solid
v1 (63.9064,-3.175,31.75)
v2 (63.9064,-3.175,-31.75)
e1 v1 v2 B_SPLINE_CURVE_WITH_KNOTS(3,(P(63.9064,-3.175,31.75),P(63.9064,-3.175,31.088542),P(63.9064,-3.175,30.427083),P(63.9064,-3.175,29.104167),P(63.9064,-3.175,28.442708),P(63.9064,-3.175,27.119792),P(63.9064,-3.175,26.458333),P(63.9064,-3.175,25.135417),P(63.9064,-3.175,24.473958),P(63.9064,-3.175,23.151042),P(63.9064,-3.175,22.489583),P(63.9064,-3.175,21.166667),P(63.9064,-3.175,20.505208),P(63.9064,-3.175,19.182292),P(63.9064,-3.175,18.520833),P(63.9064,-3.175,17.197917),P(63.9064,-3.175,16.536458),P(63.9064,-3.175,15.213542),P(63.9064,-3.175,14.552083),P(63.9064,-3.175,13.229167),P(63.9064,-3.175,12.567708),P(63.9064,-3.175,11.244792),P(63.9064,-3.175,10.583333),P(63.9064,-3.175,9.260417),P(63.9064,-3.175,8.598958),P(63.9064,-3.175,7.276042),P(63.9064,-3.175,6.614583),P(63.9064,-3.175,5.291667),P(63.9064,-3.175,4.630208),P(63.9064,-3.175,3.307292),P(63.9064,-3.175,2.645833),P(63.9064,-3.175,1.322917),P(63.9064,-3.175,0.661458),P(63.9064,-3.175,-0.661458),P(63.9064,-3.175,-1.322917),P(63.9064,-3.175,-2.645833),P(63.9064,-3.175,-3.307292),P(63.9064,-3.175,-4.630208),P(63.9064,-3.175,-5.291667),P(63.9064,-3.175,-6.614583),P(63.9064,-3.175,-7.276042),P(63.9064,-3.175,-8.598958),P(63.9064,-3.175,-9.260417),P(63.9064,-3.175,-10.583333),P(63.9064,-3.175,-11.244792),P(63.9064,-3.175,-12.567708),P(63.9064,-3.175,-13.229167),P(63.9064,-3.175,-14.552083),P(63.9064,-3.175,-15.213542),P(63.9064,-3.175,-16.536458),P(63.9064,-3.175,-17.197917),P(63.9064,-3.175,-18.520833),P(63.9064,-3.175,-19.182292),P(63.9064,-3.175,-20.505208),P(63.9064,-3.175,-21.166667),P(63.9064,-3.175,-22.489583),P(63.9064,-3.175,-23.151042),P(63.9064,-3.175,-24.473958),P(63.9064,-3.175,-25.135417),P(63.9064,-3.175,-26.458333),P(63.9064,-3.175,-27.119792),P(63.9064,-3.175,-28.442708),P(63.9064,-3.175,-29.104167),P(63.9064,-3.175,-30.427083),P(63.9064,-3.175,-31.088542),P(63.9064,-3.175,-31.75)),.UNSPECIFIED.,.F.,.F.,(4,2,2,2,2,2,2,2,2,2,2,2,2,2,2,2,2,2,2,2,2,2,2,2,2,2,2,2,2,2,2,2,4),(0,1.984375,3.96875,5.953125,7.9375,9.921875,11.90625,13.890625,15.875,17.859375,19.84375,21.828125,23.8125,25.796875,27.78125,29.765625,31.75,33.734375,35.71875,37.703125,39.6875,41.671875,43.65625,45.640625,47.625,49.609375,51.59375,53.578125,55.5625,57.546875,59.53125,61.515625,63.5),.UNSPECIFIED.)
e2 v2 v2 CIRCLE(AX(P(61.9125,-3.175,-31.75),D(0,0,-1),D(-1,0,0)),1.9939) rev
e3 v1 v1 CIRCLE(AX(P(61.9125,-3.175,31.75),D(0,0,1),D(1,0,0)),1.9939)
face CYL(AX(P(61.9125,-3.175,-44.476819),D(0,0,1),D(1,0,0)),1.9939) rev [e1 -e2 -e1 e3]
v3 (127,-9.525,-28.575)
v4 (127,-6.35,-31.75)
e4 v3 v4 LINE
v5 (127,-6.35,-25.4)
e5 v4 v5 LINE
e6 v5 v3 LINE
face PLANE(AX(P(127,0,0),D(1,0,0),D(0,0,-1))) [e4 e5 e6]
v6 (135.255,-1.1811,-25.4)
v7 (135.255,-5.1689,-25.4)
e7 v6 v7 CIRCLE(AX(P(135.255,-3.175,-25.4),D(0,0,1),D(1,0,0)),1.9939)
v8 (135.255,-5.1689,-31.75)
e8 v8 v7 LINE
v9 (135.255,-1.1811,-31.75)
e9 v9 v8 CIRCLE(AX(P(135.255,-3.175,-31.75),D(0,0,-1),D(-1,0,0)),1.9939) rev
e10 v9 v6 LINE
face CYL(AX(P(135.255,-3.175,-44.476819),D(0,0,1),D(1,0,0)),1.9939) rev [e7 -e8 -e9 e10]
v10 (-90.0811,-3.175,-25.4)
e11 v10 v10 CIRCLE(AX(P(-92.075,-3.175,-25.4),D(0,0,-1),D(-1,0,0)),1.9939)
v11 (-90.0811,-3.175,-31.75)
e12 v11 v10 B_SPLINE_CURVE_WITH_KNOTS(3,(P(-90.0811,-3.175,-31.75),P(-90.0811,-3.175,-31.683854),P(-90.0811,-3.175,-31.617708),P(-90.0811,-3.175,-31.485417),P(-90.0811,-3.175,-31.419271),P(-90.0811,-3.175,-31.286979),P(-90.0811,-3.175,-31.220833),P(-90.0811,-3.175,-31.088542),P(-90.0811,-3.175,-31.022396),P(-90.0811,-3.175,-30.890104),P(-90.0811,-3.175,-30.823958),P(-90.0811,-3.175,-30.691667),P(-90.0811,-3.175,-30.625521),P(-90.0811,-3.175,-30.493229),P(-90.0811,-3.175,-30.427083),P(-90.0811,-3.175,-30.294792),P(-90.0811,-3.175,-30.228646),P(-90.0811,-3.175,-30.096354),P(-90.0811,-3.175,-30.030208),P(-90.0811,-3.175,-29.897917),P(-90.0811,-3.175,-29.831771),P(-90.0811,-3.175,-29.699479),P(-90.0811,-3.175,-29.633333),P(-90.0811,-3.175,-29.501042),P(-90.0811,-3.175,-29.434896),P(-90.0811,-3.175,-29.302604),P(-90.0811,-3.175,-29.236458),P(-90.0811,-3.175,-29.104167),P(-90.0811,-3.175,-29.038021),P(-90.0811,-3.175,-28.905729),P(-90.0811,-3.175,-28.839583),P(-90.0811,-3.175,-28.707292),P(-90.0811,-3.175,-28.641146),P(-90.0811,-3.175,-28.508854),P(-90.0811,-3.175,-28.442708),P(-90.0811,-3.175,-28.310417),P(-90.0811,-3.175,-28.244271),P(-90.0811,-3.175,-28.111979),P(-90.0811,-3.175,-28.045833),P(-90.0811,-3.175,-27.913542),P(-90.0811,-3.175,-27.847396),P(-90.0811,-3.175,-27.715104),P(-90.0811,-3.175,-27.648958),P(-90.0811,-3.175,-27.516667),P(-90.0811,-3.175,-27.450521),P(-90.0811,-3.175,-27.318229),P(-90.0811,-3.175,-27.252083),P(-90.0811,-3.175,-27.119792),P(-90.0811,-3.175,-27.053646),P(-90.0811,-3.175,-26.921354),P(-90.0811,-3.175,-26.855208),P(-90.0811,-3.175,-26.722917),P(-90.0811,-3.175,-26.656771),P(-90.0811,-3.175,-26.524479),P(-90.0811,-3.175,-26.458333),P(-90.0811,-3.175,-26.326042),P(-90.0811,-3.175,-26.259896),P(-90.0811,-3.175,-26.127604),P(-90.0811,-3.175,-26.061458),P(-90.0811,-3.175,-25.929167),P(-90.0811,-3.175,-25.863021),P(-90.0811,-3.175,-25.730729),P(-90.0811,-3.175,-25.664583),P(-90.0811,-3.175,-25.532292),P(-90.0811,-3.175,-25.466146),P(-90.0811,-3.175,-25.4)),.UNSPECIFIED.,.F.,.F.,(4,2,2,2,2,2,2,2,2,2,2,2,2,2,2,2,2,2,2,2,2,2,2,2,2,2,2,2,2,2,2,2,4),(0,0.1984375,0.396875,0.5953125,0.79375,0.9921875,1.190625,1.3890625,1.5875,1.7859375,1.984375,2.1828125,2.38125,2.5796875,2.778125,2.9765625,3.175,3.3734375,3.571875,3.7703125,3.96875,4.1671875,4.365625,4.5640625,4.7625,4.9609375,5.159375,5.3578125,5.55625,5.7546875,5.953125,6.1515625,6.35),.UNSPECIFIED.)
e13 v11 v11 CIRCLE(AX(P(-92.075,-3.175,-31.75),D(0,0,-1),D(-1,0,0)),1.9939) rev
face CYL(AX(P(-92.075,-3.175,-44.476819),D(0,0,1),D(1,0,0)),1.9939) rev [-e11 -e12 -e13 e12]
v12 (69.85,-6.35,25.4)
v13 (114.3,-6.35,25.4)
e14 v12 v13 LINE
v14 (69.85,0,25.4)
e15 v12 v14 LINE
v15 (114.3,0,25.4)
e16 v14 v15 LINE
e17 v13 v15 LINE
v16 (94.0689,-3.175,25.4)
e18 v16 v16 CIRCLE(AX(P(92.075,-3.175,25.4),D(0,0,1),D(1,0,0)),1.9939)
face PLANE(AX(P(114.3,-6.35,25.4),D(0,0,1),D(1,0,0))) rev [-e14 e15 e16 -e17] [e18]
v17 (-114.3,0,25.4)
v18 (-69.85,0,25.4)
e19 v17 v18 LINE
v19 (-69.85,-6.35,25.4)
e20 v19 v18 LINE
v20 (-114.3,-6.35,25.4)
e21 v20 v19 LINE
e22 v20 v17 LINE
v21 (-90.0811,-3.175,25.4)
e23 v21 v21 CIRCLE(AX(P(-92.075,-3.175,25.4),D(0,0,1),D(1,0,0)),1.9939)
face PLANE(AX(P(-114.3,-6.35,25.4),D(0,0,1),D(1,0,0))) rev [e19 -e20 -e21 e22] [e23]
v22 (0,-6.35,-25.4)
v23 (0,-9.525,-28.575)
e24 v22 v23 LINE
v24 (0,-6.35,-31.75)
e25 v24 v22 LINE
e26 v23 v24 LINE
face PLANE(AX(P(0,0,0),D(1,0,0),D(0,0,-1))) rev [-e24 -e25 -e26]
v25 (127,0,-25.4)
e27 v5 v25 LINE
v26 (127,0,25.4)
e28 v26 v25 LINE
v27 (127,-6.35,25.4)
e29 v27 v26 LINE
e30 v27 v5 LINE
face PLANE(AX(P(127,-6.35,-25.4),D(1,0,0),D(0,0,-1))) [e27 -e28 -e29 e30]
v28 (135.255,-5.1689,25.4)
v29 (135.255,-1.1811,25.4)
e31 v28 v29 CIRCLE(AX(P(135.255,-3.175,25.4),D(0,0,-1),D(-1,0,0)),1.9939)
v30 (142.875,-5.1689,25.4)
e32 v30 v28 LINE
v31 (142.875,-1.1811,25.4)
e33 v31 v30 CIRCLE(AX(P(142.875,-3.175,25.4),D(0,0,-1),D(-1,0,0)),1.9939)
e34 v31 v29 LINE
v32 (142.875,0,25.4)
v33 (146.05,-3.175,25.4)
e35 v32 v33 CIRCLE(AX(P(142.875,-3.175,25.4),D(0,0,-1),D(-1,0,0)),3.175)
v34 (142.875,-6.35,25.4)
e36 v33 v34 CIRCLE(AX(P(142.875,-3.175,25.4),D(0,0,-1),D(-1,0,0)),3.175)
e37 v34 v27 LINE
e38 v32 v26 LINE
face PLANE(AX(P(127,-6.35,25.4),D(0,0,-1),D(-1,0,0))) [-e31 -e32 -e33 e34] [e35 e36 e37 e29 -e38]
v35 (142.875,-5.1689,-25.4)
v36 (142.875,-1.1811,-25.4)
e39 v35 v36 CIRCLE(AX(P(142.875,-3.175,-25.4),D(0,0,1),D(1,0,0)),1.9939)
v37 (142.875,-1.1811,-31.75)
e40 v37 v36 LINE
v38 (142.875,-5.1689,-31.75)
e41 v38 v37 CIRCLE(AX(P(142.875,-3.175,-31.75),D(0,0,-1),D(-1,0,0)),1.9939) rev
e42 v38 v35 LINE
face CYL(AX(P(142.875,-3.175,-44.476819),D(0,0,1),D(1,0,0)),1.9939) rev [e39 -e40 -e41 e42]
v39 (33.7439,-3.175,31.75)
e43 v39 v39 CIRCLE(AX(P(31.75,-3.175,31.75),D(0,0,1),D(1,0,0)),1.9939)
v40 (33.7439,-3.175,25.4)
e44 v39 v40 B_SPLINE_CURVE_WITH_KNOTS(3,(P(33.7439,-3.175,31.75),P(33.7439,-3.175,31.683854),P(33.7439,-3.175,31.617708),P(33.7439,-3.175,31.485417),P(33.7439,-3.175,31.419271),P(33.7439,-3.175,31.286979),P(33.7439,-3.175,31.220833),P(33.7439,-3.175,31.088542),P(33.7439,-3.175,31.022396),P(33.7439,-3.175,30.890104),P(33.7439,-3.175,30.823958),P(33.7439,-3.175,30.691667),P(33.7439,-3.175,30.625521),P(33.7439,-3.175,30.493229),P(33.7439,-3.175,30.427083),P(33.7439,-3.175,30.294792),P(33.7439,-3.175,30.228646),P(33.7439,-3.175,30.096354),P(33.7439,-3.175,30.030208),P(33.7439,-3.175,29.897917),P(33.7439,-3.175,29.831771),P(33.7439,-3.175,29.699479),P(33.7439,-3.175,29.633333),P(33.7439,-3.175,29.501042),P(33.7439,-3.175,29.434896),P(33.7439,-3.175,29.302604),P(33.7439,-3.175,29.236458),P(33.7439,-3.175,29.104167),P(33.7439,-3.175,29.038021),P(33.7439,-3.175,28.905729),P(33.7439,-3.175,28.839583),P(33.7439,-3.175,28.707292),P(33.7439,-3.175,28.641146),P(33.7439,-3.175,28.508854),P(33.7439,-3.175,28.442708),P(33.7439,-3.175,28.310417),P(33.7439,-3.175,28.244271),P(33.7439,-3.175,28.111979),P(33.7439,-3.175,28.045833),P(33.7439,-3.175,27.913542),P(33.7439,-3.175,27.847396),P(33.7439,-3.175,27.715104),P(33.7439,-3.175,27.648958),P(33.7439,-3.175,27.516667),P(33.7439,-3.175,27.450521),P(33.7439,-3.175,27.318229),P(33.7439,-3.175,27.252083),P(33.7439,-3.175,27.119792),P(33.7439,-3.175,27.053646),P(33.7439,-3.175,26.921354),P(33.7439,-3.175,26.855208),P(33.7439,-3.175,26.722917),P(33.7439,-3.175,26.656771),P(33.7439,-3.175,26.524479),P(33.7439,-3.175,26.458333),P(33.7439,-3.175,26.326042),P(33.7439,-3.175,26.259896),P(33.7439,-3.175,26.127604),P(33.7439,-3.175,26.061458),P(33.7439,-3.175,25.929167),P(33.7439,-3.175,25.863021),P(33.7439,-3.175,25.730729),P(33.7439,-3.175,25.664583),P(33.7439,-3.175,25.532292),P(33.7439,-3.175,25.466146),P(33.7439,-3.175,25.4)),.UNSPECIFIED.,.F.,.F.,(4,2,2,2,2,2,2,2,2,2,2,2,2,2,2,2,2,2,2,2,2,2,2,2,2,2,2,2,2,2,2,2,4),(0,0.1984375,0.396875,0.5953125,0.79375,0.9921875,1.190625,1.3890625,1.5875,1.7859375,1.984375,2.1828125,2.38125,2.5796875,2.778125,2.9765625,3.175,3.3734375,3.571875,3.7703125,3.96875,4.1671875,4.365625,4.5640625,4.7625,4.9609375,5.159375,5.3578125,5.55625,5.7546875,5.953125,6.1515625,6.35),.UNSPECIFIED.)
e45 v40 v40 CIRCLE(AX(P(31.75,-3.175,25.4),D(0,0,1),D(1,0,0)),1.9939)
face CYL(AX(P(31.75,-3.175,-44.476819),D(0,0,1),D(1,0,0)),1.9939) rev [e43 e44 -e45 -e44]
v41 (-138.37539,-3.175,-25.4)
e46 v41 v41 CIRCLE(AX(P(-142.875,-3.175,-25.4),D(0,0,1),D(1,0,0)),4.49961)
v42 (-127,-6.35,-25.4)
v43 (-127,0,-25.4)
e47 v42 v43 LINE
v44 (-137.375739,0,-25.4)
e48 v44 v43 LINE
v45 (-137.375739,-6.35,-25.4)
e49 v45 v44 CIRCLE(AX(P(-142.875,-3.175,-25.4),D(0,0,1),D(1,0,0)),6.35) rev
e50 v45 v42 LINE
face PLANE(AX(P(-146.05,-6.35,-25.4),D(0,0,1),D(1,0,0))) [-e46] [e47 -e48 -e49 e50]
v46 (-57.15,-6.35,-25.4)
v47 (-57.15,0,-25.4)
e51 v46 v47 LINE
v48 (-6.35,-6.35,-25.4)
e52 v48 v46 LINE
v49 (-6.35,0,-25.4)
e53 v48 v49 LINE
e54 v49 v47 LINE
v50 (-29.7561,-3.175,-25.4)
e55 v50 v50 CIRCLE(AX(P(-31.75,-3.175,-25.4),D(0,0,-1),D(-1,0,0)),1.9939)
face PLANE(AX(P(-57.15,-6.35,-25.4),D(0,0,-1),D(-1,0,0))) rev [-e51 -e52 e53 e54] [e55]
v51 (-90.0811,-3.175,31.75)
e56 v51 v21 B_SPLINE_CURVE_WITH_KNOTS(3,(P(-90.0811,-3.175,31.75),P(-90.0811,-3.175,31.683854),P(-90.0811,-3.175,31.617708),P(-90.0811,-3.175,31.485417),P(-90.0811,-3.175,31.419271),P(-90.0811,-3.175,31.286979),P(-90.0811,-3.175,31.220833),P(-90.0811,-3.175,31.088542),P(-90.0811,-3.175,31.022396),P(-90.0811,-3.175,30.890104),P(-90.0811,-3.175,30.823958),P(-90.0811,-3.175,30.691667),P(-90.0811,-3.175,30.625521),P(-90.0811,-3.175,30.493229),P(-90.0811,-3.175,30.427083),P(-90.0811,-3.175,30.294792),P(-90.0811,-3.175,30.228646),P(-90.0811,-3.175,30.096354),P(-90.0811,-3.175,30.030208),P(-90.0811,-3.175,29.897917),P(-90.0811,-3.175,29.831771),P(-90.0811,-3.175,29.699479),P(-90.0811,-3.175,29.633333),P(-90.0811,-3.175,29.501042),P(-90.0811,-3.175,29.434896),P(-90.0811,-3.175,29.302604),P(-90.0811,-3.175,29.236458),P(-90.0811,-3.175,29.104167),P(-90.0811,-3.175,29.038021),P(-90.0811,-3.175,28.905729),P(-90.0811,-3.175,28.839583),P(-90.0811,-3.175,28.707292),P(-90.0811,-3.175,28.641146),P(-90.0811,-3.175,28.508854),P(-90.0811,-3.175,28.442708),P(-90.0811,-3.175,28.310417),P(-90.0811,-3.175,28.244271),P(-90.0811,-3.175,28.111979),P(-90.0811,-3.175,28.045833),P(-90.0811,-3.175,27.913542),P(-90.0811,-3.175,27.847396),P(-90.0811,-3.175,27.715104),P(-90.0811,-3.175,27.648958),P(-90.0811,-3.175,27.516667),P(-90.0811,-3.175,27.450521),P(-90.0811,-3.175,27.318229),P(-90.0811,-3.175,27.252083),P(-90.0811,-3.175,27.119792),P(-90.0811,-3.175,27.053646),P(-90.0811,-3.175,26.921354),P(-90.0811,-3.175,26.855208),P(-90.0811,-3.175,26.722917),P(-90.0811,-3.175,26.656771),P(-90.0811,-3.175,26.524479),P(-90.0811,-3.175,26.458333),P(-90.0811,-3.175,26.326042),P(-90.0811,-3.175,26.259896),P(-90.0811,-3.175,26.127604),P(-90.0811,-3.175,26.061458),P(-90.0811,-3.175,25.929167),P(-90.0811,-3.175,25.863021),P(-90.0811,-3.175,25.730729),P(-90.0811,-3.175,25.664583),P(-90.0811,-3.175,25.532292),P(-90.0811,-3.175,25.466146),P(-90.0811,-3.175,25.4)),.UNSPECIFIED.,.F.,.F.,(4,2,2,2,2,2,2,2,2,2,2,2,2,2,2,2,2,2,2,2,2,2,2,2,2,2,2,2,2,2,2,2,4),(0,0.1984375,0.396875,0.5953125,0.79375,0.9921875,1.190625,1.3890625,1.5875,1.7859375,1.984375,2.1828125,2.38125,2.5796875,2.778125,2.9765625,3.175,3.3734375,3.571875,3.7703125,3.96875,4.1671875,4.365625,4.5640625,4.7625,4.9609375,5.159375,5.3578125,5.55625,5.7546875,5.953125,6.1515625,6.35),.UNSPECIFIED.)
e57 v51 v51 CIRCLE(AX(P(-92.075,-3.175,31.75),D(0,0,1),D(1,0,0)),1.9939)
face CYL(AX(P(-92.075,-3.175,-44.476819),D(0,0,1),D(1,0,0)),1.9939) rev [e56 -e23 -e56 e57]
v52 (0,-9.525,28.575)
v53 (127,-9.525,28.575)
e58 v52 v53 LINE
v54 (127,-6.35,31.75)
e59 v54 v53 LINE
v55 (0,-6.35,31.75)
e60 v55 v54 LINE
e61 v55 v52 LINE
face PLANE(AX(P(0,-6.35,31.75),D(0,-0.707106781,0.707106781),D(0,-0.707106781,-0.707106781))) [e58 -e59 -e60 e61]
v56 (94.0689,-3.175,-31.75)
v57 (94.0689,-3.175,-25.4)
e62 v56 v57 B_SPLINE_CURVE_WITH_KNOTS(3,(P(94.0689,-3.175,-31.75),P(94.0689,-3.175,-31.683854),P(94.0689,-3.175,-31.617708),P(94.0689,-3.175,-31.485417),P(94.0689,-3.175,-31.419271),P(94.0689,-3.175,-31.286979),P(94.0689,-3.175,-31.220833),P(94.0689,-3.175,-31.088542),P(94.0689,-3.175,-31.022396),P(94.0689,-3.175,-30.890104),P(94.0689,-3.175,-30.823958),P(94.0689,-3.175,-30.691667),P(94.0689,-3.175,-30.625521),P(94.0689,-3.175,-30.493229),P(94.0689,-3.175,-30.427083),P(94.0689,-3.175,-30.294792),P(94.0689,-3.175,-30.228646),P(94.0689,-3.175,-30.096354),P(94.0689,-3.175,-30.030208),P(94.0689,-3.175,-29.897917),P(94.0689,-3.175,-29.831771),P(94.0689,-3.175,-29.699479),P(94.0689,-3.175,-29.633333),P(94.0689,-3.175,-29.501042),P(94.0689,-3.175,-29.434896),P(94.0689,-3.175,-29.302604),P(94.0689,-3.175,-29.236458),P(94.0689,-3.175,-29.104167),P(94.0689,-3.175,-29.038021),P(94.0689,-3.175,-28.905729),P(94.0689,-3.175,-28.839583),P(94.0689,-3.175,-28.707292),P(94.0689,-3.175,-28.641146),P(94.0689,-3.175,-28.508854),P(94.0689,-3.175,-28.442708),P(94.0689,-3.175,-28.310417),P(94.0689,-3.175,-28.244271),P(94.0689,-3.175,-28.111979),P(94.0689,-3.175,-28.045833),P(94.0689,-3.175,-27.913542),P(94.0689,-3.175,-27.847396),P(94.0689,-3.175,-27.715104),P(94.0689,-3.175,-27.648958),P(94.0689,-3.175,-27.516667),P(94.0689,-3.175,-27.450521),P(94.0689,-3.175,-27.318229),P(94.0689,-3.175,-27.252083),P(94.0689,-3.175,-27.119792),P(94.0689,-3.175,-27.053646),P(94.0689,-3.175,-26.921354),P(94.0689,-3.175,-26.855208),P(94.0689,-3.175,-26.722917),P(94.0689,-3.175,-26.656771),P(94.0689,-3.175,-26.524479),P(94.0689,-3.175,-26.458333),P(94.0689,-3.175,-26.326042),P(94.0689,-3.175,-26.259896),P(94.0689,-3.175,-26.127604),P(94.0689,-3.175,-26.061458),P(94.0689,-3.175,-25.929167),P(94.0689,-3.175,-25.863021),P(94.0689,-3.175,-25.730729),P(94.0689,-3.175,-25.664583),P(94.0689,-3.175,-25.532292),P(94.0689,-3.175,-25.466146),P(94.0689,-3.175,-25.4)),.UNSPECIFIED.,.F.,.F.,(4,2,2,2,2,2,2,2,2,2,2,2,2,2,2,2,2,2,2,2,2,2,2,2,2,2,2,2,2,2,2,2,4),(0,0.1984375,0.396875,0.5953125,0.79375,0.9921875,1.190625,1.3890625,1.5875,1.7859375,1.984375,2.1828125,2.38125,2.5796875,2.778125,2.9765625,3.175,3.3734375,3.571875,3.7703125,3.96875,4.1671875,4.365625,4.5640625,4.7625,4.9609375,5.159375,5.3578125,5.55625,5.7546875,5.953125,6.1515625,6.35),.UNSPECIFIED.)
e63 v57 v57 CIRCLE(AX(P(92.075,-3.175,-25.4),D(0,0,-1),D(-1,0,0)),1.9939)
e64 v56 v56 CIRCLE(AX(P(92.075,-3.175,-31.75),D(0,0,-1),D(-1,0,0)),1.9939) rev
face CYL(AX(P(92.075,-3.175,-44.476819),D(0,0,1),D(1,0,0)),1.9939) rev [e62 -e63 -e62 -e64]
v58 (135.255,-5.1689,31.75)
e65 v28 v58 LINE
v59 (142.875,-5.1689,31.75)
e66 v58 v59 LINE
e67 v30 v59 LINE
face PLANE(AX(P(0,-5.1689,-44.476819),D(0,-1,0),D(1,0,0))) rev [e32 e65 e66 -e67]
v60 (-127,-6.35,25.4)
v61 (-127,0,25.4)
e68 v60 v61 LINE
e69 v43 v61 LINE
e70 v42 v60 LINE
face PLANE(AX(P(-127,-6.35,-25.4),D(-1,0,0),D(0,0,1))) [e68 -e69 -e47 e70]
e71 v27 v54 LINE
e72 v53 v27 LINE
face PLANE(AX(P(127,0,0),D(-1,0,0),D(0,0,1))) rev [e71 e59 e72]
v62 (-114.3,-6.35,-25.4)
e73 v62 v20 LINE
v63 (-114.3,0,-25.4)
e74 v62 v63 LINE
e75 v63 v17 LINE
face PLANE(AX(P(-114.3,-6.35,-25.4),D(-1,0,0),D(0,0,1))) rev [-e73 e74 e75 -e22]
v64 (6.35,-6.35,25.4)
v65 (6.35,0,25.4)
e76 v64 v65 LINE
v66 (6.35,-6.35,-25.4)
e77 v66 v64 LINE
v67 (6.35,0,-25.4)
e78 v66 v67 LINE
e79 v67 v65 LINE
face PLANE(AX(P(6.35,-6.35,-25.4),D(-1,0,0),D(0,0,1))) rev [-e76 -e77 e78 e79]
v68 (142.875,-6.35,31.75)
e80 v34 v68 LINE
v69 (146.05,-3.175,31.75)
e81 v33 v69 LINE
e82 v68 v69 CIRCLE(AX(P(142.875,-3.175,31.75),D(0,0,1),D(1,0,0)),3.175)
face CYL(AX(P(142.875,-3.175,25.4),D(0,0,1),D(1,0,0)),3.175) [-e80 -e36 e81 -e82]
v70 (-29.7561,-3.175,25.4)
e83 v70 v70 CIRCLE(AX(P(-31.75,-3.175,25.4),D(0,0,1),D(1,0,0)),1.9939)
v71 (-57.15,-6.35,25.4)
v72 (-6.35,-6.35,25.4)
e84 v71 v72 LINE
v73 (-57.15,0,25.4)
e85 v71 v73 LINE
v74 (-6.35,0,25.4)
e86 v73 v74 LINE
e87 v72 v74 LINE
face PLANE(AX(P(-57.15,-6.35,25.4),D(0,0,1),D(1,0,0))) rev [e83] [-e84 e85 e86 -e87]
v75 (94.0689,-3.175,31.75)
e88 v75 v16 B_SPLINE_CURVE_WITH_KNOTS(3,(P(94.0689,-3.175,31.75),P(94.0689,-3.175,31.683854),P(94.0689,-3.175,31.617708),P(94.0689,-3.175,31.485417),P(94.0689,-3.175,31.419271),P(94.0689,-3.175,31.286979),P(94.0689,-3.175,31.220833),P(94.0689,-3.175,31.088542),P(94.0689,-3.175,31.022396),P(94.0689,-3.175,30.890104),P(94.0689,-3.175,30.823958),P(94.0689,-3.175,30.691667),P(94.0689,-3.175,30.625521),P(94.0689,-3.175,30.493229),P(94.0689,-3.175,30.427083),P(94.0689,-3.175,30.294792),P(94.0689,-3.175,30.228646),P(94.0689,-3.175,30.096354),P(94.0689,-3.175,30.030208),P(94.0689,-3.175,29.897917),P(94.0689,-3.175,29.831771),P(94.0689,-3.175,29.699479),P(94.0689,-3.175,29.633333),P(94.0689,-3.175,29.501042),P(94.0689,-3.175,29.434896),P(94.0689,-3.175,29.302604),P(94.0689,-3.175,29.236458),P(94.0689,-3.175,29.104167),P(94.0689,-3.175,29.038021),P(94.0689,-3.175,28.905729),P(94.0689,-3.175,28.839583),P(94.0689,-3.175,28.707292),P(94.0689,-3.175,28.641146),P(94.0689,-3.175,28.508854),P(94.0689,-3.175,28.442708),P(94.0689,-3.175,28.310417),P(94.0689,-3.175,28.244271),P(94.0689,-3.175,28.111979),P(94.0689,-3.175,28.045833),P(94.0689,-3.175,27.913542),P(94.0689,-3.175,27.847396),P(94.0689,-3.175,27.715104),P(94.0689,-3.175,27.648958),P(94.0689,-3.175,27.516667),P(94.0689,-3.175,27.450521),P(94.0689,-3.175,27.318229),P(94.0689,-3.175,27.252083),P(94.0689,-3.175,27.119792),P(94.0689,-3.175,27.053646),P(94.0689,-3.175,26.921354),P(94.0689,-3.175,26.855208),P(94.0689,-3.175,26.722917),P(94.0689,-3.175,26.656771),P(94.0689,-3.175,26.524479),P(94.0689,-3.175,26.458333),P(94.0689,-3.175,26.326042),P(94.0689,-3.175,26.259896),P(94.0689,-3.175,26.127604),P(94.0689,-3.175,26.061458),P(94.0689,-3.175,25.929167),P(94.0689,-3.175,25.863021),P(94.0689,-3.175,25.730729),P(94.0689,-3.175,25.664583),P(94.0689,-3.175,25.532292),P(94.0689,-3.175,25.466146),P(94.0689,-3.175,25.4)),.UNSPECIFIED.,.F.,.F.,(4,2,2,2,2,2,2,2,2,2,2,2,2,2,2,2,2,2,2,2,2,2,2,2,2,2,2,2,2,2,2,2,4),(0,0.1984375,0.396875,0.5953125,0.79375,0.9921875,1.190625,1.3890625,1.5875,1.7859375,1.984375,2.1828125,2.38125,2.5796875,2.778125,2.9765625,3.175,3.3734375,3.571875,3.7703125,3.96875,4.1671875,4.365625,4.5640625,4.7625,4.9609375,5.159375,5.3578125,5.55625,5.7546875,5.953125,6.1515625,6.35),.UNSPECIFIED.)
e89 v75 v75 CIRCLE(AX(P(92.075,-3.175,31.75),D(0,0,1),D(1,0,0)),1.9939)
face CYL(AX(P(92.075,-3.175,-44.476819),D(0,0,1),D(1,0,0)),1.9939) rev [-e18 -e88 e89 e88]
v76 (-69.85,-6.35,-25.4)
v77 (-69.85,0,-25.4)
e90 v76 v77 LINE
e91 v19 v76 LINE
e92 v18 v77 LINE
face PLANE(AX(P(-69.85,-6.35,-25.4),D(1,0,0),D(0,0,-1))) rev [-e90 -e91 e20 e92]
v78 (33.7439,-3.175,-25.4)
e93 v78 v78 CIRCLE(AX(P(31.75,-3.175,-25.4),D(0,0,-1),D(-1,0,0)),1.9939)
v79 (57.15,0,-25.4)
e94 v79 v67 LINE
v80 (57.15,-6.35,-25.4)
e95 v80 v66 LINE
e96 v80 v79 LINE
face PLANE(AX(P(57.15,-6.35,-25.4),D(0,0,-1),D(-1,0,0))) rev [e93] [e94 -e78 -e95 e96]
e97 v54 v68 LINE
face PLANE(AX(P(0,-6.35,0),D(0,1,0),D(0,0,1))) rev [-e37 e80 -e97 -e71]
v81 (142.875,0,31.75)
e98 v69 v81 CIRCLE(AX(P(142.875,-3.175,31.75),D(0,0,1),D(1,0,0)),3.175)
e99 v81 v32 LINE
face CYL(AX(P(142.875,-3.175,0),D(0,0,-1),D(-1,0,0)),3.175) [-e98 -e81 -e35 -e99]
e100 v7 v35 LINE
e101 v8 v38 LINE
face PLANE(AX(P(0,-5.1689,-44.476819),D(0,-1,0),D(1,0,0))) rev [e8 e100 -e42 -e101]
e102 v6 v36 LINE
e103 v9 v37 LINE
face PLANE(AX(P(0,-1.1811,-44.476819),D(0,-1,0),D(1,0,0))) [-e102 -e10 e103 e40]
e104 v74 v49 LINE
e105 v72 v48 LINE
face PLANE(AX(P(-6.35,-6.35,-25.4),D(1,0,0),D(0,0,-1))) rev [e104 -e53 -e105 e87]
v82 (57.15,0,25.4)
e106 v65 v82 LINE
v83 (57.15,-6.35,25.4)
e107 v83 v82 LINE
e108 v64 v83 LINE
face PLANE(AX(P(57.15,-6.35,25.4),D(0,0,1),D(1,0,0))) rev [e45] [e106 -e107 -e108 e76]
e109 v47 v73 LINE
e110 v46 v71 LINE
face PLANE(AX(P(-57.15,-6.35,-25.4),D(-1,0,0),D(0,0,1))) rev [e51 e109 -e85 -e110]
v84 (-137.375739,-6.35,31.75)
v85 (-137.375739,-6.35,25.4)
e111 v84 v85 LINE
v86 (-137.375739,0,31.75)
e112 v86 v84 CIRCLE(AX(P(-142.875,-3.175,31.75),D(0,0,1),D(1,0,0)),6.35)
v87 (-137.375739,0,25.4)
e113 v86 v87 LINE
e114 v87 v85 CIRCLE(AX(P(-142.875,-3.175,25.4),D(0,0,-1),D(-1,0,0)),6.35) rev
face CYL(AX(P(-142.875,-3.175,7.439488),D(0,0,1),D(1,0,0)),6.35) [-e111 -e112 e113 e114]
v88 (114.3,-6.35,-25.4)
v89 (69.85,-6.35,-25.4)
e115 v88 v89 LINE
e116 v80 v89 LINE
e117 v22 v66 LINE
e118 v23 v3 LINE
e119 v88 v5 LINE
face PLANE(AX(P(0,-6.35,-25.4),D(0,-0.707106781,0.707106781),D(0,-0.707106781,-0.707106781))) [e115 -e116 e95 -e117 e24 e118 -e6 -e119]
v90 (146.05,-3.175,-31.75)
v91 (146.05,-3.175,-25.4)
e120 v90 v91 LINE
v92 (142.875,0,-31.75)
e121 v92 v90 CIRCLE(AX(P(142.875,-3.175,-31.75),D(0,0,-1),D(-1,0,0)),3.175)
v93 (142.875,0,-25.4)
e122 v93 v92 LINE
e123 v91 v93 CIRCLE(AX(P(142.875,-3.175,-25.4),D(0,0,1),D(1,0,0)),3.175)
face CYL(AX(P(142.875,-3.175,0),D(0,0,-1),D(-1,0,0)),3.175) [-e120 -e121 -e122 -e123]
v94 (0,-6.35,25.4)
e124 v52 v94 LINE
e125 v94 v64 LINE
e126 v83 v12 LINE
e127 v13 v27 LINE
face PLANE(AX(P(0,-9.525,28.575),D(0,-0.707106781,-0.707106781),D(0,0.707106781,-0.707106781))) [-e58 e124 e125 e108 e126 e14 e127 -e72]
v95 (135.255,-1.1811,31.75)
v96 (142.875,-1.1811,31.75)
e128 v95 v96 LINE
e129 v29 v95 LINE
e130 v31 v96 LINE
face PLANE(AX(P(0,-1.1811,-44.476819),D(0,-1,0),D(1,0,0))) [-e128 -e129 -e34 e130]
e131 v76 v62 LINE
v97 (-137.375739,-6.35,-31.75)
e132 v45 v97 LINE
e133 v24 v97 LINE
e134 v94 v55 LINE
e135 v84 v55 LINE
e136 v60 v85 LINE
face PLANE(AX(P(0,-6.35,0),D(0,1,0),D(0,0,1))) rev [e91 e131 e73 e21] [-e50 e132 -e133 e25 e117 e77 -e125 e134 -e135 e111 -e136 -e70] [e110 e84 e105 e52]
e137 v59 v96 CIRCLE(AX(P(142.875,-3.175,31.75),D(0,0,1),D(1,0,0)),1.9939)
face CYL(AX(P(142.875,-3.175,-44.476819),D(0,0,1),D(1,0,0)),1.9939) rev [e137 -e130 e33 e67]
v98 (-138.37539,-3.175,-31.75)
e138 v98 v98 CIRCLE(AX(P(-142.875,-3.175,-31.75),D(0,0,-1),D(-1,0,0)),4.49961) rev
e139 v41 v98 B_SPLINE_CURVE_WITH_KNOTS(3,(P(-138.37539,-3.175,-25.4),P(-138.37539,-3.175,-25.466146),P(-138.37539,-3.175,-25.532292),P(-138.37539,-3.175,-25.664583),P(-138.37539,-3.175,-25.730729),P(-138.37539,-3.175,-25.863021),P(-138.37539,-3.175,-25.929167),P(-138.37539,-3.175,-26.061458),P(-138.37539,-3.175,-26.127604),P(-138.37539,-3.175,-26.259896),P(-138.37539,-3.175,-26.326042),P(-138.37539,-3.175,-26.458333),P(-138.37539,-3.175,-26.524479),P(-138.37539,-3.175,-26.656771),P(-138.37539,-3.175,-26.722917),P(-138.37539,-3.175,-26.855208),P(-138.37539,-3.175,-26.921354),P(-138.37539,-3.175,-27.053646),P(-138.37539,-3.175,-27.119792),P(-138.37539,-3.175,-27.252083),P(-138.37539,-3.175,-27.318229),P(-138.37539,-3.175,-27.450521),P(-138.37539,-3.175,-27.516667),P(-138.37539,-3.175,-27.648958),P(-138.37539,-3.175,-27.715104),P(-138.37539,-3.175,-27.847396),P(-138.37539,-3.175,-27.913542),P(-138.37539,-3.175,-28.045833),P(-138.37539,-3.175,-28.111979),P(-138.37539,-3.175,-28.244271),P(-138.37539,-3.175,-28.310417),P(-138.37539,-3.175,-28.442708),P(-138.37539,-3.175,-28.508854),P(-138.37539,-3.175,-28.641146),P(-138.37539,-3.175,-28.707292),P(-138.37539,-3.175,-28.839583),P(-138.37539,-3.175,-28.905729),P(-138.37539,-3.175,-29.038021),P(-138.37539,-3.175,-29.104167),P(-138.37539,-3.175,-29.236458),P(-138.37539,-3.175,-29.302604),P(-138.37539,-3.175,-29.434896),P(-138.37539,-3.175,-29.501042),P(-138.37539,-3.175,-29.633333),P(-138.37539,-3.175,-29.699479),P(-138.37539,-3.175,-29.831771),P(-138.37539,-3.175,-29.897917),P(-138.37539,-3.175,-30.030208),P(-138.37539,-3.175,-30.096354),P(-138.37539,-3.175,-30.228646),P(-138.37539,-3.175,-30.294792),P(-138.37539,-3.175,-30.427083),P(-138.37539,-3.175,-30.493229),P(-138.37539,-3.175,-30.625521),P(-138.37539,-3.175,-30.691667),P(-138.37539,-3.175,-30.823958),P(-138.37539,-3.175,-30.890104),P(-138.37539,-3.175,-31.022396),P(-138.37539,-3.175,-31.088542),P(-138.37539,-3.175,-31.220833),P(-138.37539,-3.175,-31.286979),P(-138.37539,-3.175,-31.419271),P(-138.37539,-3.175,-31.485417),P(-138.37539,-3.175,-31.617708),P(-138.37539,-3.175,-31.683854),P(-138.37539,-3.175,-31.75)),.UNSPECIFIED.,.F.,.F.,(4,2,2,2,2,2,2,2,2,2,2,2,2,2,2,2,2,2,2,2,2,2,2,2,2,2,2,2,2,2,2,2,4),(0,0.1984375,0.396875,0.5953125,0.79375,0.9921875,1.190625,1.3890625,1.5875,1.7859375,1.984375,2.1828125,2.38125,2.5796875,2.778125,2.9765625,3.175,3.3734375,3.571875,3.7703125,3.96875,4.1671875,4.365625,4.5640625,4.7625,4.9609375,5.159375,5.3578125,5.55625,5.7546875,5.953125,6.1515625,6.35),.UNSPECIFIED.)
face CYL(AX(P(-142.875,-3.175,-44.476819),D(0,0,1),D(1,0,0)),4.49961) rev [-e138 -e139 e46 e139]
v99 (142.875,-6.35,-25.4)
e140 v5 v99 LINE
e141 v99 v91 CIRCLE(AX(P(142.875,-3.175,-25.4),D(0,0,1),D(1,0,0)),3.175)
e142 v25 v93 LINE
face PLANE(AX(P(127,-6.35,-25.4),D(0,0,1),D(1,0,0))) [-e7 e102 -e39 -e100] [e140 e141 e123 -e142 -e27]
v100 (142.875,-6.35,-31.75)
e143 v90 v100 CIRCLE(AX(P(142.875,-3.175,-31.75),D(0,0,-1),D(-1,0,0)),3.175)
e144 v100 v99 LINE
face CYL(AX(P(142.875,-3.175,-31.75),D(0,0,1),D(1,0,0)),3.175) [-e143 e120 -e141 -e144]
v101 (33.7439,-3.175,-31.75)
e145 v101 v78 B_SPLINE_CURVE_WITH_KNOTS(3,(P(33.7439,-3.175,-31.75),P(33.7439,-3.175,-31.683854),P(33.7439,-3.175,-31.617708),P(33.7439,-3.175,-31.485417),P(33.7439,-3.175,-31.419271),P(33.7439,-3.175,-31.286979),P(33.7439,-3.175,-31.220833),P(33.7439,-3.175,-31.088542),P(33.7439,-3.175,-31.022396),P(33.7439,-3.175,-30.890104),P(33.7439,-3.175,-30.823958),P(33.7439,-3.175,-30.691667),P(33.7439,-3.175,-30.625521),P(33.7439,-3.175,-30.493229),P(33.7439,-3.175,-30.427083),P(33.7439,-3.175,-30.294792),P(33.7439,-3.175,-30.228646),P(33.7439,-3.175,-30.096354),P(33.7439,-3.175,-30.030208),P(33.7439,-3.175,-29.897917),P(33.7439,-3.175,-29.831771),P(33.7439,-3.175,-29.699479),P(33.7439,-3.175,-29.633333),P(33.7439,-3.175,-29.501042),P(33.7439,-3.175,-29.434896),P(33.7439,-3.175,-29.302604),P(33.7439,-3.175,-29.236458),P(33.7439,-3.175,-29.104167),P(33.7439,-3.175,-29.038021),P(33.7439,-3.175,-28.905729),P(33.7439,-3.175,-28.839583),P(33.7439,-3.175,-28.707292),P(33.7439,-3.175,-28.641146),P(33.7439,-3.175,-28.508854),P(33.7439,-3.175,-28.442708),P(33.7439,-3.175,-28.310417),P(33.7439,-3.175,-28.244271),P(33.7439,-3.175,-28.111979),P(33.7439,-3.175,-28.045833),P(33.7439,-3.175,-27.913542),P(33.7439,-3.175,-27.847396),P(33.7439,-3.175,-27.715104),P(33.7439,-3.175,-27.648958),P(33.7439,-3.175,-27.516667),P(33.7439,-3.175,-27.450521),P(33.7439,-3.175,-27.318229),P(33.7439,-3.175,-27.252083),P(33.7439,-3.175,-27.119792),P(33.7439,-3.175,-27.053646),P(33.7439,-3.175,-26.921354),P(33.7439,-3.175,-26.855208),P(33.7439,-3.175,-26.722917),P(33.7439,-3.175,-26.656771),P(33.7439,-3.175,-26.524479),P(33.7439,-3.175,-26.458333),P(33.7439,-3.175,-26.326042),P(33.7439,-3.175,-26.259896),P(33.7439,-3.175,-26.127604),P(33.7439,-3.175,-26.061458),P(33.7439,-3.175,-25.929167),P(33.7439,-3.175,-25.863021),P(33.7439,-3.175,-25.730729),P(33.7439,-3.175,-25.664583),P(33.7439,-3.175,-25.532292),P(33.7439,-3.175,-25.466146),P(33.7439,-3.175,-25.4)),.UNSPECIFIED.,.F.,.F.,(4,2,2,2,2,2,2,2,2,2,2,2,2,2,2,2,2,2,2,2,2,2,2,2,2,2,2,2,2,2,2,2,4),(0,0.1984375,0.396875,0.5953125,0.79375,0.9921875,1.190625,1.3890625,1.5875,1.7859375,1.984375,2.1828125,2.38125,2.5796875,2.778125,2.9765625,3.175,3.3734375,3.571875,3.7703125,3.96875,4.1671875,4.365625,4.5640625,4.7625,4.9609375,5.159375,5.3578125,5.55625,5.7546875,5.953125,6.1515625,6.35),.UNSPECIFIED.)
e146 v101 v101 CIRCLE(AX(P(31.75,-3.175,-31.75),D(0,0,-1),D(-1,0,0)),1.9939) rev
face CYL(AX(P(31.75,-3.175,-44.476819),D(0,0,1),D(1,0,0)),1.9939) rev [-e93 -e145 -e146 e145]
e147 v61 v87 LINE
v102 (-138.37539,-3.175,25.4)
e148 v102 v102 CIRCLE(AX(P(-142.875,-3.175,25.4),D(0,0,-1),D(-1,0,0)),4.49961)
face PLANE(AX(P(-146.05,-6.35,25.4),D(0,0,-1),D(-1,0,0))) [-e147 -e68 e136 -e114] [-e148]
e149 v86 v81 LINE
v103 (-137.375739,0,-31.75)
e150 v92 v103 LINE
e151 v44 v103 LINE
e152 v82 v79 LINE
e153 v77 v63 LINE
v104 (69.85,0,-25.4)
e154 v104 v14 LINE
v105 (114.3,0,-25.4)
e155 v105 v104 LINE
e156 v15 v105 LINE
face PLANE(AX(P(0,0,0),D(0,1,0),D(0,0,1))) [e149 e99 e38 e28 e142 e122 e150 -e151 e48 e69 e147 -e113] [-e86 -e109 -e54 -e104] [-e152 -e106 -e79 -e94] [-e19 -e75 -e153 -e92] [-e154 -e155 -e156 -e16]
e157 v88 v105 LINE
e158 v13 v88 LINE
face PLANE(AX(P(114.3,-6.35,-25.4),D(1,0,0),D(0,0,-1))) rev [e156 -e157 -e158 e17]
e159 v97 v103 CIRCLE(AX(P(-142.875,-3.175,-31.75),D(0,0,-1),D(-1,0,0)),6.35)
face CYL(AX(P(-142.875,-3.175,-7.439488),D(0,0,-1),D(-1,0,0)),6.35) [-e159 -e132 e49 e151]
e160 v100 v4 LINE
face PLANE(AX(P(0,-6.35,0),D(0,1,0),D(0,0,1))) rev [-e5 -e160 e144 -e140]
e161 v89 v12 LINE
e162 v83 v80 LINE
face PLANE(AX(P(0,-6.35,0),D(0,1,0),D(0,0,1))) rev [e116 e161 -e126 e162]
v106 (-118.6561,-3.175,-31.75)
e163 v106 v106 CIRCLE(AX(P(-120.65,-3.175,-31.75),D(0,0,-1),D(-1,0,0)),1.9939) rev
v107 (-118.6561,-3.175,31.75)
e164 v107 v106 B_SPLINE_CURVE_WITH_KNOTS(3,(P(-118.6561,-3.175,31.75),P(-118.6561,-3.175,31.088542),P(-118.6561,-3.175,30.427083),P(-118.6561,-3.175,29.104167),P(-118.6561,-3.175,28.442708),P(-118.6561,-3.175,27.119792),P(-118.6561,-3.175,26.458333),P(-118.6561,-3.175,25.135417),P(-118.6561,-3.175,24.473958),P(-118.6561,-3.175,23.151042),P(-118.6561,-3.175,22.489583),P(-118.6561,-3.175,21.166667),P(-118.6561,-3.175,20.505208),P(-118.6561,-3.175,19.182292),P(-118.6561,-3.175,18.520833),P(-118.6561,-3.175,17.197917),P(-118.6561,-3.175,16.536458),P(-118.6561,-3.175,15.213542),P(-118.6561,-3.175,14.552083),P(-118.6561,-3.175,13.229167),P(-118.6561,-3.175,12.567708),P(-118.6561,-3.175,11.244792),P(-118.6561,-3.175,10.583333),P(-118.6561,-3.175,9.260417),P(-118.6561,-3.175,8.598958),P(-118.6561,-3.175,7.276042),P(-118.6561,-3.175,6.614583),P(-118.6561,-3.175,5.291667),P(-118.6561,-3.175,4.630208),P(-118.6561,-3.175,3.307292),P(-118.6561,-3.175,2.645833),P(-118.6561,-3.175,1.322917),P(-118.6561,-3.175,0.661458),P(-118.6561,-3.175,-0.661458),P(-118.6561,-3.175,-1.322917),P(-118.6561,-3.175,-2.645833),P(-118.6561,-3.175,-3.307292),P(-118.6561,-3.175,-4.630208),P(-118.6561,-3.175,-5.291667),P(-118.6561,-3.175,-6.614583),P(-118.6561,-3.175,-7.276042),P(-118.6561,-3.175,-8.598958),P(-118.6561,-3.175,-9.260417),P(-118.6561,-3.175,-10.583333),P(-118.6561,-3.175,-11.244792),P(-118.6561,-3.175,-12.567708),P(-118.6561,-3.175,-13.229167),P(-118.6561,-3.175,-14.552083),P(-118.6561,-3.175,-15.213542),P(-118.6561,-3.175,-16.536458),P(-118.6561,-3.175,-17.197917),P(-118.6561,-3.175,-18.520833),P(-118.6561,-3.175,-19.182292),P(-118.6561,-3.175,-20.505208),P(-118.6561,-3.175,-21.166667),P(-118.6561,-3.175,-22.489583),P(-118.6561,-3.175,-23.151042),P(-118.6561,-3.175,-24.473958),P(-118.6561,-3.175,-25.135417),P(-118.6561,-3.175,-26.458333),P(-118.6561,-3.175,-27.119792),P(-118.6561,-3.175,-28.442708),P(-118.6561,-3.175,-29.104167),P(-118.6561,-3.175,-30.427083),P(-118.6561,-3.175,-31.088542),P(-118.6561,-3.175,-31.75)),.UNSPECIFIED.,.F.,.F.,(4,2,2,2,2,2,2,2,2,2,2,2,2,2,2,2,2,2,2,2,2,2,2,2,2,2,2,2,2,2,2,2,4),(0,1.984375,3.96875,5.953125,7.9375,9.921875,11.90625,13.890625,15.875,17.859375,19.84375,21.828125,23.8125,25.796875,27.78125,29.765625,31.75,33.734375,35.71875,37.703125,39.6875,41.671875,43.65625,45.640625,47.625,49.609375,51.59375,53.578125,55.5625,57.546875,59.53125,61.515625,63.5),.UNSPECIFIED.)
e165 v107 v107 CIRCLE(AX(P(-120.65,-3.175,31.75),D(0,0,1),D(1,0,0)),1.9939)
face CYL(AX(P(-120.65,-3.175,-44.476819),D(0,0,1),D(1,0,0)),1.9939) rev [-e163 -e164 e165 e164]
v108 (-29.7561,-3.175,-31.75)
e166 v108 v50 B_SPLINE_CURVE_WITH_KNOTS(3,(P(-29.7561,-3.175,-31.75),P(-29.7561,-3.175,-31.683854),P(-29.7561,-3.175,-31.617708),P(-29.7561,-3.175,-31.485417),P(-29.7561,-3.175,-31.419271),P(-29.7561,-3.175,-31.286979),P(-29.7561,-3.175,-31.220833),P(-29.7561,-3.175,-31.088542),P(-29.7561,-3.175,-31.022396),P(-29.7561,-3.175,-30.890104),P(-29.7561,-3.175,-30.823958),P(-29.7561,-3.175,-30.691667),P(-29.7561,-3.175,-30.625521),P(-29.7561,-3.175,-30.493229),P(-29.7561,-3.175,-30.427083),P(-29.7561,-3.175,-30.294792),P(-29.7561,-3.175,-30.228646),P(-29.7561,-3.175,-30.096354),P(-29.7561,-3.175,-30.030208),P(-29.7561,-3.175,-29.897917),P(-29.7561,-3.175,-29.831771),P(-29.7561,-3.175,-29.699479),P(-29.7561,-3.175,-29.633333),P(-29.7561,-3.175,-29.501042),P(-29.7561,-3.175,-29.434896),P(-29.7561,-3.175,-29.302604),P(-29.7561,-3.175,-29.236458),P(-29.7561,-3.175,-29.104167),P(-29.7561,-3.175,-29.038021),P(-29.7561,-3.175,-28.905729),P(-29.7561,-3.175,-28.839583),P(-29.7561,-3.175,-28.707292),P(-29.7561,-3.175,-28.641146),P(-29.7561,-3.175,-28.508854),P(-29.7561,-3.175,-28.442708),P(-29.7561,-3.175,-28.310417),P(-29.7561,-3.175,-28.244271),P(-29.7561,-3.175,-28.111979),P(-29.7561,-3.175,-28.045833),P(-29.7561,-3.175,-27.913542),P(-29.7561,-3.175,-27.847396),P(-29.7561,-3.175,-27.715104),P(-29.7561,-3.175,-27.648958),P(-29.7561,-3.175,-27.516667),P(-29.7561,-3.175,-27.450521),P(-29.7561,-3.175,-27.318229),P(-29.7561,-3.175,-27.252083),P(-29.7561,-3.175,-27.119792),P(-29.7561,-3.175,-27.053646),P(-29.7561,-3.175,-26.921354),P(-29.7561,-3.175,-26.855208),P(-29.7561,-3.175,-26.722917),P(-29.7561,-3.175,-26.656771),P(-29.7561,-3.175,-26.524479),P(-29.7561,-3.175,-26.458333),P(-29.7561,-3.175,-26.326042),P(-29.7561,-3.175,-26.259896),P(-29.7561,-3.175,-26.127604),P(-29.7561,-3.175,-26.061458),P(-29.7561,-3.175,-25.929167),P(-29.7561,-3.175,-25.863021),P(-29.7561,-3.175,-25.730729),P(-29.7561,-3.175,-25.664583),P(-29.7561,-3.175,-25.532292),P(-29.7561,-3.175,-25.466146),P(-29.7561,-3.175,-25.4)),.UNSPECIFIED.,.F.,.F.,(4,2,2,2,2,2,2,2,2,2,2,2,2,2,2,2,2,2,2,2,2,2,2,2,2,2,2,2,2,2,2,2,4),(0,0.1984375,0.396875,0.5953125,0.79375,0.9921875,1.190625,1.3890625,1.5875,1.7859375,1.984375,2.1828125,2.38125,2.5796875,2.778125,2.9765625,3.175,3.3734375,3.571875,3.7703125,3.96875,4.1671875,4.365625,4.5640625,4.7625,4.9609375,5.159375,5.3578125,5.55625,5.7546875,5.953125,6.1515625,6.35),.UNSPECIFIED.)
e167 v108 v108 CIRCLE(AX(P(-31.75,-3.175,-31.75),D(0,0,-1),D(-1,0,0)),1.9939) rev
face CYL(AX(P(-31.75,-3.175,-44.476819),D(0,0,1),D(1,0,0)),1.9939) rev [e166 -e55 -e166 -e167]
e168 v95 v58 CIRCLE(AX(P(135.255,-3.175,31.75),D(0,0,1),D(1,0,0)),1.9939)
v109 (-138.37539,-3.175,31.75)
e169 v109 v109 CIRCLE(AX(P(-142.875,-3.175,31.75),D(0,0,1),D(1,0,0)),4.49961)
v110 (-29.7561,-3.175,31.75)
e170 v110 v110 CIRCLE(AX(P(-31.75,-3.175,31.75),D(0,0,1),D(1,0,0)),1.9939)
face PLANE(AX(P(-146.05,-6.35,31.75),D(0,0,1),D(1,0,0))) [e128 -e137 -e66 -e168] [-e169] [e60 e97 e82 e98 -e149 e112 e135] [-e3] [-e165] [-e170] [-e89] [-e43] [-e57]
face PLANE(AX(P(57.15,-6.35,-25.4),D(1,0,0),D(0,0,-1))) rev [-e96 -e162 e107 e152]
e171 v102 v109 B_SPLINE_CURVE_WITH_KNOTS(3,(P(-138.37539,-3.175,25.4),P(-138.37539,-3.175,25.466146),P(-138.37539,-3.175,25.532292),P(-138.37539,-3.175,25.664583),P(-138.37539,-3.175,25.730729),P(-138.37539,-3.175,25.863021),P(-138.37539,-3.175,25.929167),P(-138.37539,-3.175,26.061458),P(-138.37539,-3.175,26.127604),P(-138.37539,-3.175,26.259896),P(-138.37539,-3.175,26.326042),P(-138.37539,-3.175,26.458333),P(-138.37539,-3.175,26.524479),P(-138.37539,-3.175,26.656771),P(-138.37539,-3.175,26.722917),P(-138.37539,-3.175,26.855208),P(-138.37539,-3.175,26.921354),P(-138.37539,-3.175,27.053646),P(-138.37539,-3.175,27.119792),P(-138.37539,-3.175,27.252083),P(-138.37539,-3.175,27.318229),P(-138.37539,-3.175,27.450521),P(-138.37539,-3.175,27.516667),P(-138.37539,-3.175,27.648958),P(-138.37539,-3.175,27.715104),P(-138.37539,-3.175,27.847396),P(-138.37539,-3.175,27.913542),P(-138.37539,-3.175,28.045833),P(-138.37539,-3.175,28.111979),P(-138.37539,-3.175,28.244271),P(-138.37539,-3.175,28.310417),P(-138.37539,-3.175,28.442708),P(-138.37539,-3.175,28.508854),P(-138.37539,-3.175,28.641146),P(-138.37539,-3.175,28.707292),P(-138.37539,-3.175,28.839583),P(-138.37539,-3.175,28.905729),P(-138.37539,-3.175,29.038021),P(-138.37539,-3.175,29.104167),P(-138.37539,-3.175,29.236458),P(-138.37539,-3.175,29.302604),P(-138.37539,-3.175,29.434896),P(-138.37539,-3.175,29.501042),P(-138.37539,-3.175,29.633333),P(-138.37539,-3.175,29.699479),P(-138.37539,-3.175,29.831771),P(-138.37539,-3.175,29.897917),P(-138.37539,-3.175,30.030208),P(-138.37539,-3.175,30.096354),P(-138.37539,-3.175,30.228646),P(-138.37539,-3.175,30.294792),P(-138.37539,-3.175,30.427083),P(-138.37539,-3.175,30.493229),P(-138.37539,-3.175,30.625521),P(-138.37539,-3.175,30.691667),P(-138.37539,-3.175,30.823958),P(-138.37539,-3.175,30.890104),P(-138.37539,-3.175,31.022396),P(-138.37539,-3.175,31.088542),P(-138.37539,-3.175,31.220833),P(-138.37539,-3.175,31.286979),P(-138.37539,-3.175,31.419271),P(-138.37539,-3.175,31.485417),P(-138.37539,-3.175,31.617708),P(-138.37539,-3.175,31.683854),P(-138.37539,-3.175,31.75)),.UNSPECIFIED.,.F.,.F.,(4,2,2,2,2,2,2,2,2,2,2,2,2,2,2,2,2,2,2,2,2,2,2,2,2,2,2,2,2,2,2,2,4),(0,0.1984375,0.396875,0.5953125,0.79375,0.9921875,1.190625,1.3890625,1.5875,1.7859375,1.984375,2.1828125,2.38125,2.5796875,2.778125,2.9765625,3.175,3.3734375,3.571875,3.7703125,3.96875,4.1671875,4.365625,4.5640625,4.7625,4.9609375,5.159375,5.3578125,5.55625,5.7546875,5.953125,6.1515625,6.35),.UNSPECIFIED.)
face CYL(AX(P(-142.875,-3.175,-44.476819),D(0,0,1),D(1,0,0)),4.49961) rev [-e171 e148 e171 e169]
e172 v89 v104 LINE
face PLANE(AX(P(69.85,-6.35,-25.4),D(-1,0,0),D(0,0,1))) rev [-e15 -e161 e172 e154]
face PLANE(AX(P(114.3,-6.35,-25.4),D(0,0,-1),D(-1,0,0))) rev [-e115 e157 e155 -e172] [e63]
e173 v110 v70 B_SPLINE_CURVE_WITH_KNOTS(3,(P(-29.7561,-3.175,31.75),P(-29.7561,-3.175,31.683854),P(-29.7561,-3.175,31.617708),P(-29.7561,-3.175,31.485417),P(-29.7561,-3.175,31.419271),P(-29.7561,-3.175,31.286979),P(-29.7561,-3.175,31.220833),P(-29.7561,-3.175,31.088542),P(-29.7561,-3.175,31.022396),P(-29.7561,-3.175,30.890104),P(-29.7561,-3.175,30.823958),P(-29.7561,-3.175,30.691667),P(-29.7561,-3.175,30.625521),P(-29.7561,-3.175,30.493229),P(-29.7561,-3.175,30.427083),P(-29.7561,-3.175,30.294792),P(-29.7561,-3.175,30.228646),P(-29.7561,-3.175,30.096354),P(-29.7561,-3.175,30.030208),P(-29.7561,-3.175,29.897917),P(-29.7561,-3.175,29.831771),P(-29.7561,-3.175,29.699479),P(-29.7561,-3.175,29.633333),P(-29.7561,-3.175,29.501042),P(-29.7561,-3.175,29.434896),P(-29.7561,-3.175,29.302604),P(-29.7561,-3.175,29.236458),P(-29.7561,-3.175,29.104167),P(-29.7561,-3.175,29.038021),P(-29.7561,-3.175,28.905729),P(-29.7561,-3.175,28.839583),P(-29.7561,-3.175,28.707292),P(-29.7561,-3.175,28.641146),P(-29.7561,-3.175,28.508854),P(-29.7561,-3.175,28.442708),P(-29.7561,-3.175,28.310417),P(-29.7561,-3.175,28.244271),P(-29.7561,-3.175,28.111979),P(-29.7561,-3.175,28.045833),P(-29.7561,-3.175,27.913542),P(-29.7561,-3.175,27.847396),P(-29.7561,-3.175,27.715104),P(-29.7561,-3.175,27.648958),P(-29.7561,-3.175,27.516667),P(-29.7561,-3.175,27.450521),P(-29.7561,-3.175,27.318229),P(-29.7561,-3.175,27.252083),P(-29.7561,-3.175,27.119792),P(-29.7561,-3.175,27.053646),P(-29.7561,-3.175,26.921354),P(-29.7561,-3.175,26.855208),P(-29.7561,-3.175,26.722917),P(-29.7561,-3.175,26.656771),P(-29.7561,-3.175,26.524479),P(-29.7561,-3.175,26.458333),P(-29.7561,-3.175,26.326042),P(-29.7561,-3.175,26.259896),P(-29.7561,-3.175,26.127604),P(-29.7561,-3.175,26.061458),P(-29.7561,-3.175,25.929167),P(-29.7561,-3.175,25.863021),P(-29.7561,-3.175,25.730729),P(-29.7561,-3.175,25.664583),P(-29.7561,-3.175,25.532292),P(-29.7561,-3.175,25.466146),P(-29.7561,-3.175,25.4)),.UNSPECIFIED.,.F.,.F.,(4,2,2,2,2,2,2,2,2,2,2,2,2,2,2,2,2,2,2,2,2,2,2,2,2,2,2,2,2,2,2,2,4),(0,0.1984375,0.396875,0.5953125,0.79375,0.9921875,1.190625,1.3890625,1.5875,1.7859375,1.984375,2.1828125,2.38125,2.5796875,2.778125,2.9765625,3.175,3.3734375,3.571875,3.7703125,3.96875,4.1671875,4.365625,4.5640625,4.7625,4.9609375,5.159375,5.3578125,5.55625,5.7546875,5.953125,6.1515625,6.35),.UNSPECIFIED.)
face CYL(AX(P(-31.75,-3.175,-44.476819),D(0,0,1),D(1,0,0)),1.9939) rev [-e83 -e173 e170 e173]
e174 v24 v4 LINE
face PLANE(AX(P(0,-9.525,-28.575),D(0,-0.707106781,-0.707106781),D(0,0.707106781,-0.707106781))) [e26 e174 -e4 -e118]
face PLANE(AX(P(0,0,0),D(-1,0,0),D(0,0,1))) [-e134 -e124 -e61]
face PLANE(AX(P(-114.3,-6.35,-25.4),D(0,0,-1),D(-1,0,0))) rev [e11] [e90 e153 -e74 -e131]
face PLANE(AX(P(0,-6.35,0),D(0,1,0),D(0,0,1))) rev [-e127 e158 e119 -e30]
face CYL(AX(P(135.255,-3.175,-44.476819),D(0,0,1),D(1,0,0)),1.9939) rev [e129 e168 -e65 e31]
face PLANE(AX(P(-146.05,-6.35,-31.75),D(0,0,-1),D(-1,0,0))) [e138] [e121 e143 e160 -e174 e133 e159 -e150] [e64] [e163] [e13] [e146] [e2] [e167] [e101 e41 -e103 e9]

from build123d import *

# Parameters (mm, degrees)
SKETCH1_W           = 50.8
SKETCH1_H           = 50.8
SKETCH1_W_2         = 44.45
BOSS_EXTRUDE1_DEPTH = 6.35
FILLET2_R           = 3.175
SKETCH2_R           = 6.35
BOSS_EXTRUDE3_DEPTH = 6.35
BOSS_EXTRUDE4_START = -6.35
SKETCH4_R           = 6.35
BOSS_EXTRUDE4_DEPTH = 6.35
CUT_EXTRUDE1_REACH  = 164.453
SKETCH2_4_R         = 4.49961
SKETCH2_4_R_2       = 1.9939
BOSS_EXTRUDE5_DEPTH = 127


with BuildPart() as part:
    # Sketch1 → Boss-Extrude1 (new body)
    with BuildSketch(Plane(origin=(0, 0, 0), x_dir=(1, 0, 0), z_dir=(0, 1, 0))):
        Polygon((-146.05, 25.4), (-127, 25.4), (-127, -25.4), (-146.05, -25.4), (-146.05, -31.75), (146.05, -31.75), (146.05, -25.4), (127, -25.4), (127, 25.4), (146.05, 25.4), (146.05, 31.75), (-146.05, 31.75), align=None)
        with Locations((-31.75, 0)):
            Rectangle(SKETCH1_W, SKETCH1_H, mode=Mode.SUBTRACT)
        with Locations((-92.075, 0)):
            Rectangle(SKETCH1_W_2, SKETCH1_H, mode=Mode.SUBTRACT)
        with Locations((31.75, 0)):
            Rectangle(SKETCH1_W, SKETCH1_H, mode=Mode.SUBTRACT)
        with Locations((92.075, 0)):
            Rectangle(SKETCH1_W_2, SKETCH1_H, mode=Mode.SUBTRACT)
    extrude(amount=-BOSS_EXTRUDE1_DEPTH)

    # Fillet2
    fillet2_edges = [part.edges().sort_by_distance(p)[0] for p in [
        (-146.05, -6.35, 28.575),
        (-146.05, 0, 28.575),
        (-146.05, -6.35, -28.575),
        (-146.05, 0, -28.575),
        (146.05, -6.35, -28.575),
        (146.05, 0, -28.575),
        (146.05, -6.35, 28.575),
        (146.05, 0, 28.575),
    ]]
    fillet(fillet2_edges, radius=FILLET2_R - 0.0001)  # a hair under: the kernel refuses the full size

    # Sketch2 → Boss-Extrude3 (add)
    with BuildSketch(Plane.XY.offset(31.75)):
        with Locations((-142.875, -3.175)):
            Circle(SKETCH2_R)
    extrude(amount=-BOSS_EXTRUDE3_DEPTH)

    # Sketch4 → Boss-Extrude4 (add)
    with BuildSketch(Plane(origin=(0, 0, -31.75), x_dir=(-1, 0, 0), z_dir=(0, 0, -1)).offset(BOSS_EXTRUDE4_START)):
        with Locations((142.875, -3.175)):
            Circle(SKETCH4_R)
    extrude(amount=BOSS_EXTRUDE4_DEPTH)

    # Cut-Extrude1: up to this face of the body (flat: up to its plane)
    cut_extrude1_end = Plane(part.part.faces().sort_by_distance((-5.43222234, -3.175, -31.75))[0])
    # Sketch2<4> → Cut-Extrude1 (cut, up to the picked face)
    with BuildSketch(Plane.XY.offset(31.75), mode=Mode.PRIVATE) as cut_extrude1_sk1:
        with Locations((-142.875, -3.175)):
            Circle(SKETCH2_4_R)
    cut_extrude1_tool1 = split(extrude(cut_extrude1_sk1.sketch, amount=-CUT_EXTRUDE1_REACH, mode=Mode.PRIVATE), bisect_by=cut_extrude1_end, keep=Keep.BOTH, mode=Mode.PRIVATE)
    # Sketch2<4> → Cut-Extrude1 (cut, up to the picked face)
    with BuildSketch(Plane.XY.offset(31.75), mode=Mode.PRIVATE) as cut_extrude1_sk2:
        with Locations((-92.075, -3.175)):
            Circle(SKETCH2_4_R_2)
    cut_extrude1_tool2 = split(extrude(cut_extrude1_sk2.sketch, amount=-CUT_EXTRUDE1_REACH, mode=Mode.PRIVATE), bisect_by=cut_extrude1_end, keep=Keep.BOTH, mode=Mode.PRIVATE)
    # Sketch2<4> → Cut-Extrude1 (cut, up to the picked face)
    with BuildSketch(Plane.XY.offset(31.75), mode=Mode.PRIVATE) as cut_extrude1_sk3:
        with Locations((-31.75, -3.175)):
            Circle(SKETCH2_4_R_2)
    cut_extrude1_tool3 = split(extrude(cut_extrude1_sk3.sketch, amount=-CUT_EXTRUDE1_REACH, mode=Mode.PRIVATE), bisect_by=cut_extrude1_end, keep=Keep.BOTH, mode=Mode.PRIVATE)
    # Sketch2<4> → Cut-Extrude1 (cut, up to the picked face)
    with BuildSketch(Plane.XY.offset(31.75), mode=Mode.PRIVATE) as cut_extrude1_sk4:
        with Locations((31.75, -3.175)):
            Circle(SKETCH2_4_R_2)
    cut_extrude1_tool4 = split(extrude(cut_extrude1_sk4.sketch, amount=-CUT_EXTRUDE1_REACH, mode=Mode.PRIVATE), bisect_by=cut_extrude1_end, keep=Keep.BOTH, mode=Mode.PRIVATE)
    # Sketch2<4> → Cut-Extrude1 (cut, up to the picked face)
    with BuildSketch(Plane.XY.offset(31.75), mode=Mode.PRIVATE) as cut_extrude1_sk5:
        with Locations((92.075, -3.175)):
            Circle(SKETCH2_4_R_2)
    cut_extrude1_tool5 = split(extrude(cut_extrude1_sk5.sketch, amount=-CUT_EXTRUDE1_REACH, mode=Mode.PRIVATE), bisect_by=cut_extrude1_end, keep=Keep.BOTH, mode=Mode.PRIVATE)
    # Sketch2<4> → Cut-Extrude1 (cut, up to the picked face)
    with BuildSketch(Plane.XY.offset(31.75), mode=Mode.PRIVATE) as cut_extrude1_sk6:
        with Locations((-120.65, -3.175)):
            Circle(SKETCH2_4_R_2)
    cut_extrude1_tool6 = split(extrude(cut_extrude1_sk6.sketch, amount=-CUT_EXTRUDE1_REACH, mode=Mode.PRIVATE), bisect_by=cut_extrude1_end, keep=Keep.BOTH, mode=Mode.PRIVATE)
    # Sketch2<4> → Cut-Extrude1 (cut, up to the picked face)
    with BuildSketch(Plane.XY.offset(31.75), mode=Mode.PRIVATE) as cut_extrude1_sk7:
        with Locations((61.9125, -3.175)):
            Circle(SKETCH2_4_R_2)
    cut_extrude1_tool7 = split(extrude(cut_extrude1_sk7.sketch, amount=-CUT_EXTRUDE1_REACH, mode=Mode.PRIVATE), bisect_by=cut_extrude1_end, keep=Keep.BOTH, mode=Mode.PRIVATE)
    # Sketch2<4> → Cut-Extrude1 (cut, up to the picked face)
    with BuildSketch(Plane.XY.offset(31.75), mode=Mode.PRIVATE) as cut_extrude1_sk8:
        with BuildLine():
            Line((135.255, -1.1811), (142.875, -1.1811))
            ThreePointArc((142.875, -1.1811), (144.8689, -3.175), (142.875, -5.1689))
            Line((142.875, -5.1689), (135.255, -5.1689))
            ThreePointArc((135.255, -5.1689), (133.2611, -3.175), (135.255, -1.1811))
        make_face()
    cut_extrude1_tool8 = split(extrude(cut_extrude1_sk8.sketch, amount=-CUT_EXTRUDE1_REACH, mode=Mode.PRIVATE), bisect_by=cut_extrude1_end, keep=Keep.BOTH, mode=Mode.PRIVATE)
    add(cut_extrude1_tool1.solids().sort_by(Axis((-142.875, -3.175, 31.75), (0, 0, -1)))[0], mode=Mode.SUBTRACT)
    add(cut_extrude1_tool2.solids().sort_by(Axis((-92.075, -3.175, 31.75), (0, 0, -1)))[0], mode=Mode.SUBTRACT)
    add(cut_extrude1_tool3.solids().sort_by(Axis((-31.75, -3.175, 31.75), (0, 0, -1)))[0], mode=Mode.SUBTRACT)
    add(cut_extrude1_tool4.solids().sort_by(Axis((31.75, -3.175, 31.75), (0, 0, -1)))[0], mode=Mode.SUBTRACT)
    add(cut_extrude1_tool5.solids().sort_by(Axis((92.075, -3.175, 31.75), (0, 0, -1)))[0], mode=Mode.SUBTRACT)
    add(cut_extrude1_tool6.solids().sort_by(Axis((-120.65, -3.175, 31.75), (0, 0, -1)))[0], mode=Mode.SUBTRACT)
    add(cut_extrude1_tool7.solids().sort_by(Axis((61.9125, -3.175, 31.75), (0, 0, -1)))[0], mode=Mode.SUBTRACT)
    add(cut_extrude1_tool8.solids().sort_by(Axis((139.065, -3.175, 31.75), (0, 0, -1)))[0], mode=Mode.SUBTRACT)

    # Sketch5 → Boss-Extrude5 (add)
    with BuildSketch(Plane(origin=(127, 0, 0), x_dir=(0, 0, -1), z_dir=(1, 0, 0))):
        Polygon((25.4, -6.35), (31.75, -6.35), (28.575, -9.525), align=None)
        Polygon((-31.75, -6.35), (-25.4, -6.35), (-28.575, -9.525), align=None)
    extrude(amount=-BOSS_EXTRUDE5_DEPTH)


solid = part.part
